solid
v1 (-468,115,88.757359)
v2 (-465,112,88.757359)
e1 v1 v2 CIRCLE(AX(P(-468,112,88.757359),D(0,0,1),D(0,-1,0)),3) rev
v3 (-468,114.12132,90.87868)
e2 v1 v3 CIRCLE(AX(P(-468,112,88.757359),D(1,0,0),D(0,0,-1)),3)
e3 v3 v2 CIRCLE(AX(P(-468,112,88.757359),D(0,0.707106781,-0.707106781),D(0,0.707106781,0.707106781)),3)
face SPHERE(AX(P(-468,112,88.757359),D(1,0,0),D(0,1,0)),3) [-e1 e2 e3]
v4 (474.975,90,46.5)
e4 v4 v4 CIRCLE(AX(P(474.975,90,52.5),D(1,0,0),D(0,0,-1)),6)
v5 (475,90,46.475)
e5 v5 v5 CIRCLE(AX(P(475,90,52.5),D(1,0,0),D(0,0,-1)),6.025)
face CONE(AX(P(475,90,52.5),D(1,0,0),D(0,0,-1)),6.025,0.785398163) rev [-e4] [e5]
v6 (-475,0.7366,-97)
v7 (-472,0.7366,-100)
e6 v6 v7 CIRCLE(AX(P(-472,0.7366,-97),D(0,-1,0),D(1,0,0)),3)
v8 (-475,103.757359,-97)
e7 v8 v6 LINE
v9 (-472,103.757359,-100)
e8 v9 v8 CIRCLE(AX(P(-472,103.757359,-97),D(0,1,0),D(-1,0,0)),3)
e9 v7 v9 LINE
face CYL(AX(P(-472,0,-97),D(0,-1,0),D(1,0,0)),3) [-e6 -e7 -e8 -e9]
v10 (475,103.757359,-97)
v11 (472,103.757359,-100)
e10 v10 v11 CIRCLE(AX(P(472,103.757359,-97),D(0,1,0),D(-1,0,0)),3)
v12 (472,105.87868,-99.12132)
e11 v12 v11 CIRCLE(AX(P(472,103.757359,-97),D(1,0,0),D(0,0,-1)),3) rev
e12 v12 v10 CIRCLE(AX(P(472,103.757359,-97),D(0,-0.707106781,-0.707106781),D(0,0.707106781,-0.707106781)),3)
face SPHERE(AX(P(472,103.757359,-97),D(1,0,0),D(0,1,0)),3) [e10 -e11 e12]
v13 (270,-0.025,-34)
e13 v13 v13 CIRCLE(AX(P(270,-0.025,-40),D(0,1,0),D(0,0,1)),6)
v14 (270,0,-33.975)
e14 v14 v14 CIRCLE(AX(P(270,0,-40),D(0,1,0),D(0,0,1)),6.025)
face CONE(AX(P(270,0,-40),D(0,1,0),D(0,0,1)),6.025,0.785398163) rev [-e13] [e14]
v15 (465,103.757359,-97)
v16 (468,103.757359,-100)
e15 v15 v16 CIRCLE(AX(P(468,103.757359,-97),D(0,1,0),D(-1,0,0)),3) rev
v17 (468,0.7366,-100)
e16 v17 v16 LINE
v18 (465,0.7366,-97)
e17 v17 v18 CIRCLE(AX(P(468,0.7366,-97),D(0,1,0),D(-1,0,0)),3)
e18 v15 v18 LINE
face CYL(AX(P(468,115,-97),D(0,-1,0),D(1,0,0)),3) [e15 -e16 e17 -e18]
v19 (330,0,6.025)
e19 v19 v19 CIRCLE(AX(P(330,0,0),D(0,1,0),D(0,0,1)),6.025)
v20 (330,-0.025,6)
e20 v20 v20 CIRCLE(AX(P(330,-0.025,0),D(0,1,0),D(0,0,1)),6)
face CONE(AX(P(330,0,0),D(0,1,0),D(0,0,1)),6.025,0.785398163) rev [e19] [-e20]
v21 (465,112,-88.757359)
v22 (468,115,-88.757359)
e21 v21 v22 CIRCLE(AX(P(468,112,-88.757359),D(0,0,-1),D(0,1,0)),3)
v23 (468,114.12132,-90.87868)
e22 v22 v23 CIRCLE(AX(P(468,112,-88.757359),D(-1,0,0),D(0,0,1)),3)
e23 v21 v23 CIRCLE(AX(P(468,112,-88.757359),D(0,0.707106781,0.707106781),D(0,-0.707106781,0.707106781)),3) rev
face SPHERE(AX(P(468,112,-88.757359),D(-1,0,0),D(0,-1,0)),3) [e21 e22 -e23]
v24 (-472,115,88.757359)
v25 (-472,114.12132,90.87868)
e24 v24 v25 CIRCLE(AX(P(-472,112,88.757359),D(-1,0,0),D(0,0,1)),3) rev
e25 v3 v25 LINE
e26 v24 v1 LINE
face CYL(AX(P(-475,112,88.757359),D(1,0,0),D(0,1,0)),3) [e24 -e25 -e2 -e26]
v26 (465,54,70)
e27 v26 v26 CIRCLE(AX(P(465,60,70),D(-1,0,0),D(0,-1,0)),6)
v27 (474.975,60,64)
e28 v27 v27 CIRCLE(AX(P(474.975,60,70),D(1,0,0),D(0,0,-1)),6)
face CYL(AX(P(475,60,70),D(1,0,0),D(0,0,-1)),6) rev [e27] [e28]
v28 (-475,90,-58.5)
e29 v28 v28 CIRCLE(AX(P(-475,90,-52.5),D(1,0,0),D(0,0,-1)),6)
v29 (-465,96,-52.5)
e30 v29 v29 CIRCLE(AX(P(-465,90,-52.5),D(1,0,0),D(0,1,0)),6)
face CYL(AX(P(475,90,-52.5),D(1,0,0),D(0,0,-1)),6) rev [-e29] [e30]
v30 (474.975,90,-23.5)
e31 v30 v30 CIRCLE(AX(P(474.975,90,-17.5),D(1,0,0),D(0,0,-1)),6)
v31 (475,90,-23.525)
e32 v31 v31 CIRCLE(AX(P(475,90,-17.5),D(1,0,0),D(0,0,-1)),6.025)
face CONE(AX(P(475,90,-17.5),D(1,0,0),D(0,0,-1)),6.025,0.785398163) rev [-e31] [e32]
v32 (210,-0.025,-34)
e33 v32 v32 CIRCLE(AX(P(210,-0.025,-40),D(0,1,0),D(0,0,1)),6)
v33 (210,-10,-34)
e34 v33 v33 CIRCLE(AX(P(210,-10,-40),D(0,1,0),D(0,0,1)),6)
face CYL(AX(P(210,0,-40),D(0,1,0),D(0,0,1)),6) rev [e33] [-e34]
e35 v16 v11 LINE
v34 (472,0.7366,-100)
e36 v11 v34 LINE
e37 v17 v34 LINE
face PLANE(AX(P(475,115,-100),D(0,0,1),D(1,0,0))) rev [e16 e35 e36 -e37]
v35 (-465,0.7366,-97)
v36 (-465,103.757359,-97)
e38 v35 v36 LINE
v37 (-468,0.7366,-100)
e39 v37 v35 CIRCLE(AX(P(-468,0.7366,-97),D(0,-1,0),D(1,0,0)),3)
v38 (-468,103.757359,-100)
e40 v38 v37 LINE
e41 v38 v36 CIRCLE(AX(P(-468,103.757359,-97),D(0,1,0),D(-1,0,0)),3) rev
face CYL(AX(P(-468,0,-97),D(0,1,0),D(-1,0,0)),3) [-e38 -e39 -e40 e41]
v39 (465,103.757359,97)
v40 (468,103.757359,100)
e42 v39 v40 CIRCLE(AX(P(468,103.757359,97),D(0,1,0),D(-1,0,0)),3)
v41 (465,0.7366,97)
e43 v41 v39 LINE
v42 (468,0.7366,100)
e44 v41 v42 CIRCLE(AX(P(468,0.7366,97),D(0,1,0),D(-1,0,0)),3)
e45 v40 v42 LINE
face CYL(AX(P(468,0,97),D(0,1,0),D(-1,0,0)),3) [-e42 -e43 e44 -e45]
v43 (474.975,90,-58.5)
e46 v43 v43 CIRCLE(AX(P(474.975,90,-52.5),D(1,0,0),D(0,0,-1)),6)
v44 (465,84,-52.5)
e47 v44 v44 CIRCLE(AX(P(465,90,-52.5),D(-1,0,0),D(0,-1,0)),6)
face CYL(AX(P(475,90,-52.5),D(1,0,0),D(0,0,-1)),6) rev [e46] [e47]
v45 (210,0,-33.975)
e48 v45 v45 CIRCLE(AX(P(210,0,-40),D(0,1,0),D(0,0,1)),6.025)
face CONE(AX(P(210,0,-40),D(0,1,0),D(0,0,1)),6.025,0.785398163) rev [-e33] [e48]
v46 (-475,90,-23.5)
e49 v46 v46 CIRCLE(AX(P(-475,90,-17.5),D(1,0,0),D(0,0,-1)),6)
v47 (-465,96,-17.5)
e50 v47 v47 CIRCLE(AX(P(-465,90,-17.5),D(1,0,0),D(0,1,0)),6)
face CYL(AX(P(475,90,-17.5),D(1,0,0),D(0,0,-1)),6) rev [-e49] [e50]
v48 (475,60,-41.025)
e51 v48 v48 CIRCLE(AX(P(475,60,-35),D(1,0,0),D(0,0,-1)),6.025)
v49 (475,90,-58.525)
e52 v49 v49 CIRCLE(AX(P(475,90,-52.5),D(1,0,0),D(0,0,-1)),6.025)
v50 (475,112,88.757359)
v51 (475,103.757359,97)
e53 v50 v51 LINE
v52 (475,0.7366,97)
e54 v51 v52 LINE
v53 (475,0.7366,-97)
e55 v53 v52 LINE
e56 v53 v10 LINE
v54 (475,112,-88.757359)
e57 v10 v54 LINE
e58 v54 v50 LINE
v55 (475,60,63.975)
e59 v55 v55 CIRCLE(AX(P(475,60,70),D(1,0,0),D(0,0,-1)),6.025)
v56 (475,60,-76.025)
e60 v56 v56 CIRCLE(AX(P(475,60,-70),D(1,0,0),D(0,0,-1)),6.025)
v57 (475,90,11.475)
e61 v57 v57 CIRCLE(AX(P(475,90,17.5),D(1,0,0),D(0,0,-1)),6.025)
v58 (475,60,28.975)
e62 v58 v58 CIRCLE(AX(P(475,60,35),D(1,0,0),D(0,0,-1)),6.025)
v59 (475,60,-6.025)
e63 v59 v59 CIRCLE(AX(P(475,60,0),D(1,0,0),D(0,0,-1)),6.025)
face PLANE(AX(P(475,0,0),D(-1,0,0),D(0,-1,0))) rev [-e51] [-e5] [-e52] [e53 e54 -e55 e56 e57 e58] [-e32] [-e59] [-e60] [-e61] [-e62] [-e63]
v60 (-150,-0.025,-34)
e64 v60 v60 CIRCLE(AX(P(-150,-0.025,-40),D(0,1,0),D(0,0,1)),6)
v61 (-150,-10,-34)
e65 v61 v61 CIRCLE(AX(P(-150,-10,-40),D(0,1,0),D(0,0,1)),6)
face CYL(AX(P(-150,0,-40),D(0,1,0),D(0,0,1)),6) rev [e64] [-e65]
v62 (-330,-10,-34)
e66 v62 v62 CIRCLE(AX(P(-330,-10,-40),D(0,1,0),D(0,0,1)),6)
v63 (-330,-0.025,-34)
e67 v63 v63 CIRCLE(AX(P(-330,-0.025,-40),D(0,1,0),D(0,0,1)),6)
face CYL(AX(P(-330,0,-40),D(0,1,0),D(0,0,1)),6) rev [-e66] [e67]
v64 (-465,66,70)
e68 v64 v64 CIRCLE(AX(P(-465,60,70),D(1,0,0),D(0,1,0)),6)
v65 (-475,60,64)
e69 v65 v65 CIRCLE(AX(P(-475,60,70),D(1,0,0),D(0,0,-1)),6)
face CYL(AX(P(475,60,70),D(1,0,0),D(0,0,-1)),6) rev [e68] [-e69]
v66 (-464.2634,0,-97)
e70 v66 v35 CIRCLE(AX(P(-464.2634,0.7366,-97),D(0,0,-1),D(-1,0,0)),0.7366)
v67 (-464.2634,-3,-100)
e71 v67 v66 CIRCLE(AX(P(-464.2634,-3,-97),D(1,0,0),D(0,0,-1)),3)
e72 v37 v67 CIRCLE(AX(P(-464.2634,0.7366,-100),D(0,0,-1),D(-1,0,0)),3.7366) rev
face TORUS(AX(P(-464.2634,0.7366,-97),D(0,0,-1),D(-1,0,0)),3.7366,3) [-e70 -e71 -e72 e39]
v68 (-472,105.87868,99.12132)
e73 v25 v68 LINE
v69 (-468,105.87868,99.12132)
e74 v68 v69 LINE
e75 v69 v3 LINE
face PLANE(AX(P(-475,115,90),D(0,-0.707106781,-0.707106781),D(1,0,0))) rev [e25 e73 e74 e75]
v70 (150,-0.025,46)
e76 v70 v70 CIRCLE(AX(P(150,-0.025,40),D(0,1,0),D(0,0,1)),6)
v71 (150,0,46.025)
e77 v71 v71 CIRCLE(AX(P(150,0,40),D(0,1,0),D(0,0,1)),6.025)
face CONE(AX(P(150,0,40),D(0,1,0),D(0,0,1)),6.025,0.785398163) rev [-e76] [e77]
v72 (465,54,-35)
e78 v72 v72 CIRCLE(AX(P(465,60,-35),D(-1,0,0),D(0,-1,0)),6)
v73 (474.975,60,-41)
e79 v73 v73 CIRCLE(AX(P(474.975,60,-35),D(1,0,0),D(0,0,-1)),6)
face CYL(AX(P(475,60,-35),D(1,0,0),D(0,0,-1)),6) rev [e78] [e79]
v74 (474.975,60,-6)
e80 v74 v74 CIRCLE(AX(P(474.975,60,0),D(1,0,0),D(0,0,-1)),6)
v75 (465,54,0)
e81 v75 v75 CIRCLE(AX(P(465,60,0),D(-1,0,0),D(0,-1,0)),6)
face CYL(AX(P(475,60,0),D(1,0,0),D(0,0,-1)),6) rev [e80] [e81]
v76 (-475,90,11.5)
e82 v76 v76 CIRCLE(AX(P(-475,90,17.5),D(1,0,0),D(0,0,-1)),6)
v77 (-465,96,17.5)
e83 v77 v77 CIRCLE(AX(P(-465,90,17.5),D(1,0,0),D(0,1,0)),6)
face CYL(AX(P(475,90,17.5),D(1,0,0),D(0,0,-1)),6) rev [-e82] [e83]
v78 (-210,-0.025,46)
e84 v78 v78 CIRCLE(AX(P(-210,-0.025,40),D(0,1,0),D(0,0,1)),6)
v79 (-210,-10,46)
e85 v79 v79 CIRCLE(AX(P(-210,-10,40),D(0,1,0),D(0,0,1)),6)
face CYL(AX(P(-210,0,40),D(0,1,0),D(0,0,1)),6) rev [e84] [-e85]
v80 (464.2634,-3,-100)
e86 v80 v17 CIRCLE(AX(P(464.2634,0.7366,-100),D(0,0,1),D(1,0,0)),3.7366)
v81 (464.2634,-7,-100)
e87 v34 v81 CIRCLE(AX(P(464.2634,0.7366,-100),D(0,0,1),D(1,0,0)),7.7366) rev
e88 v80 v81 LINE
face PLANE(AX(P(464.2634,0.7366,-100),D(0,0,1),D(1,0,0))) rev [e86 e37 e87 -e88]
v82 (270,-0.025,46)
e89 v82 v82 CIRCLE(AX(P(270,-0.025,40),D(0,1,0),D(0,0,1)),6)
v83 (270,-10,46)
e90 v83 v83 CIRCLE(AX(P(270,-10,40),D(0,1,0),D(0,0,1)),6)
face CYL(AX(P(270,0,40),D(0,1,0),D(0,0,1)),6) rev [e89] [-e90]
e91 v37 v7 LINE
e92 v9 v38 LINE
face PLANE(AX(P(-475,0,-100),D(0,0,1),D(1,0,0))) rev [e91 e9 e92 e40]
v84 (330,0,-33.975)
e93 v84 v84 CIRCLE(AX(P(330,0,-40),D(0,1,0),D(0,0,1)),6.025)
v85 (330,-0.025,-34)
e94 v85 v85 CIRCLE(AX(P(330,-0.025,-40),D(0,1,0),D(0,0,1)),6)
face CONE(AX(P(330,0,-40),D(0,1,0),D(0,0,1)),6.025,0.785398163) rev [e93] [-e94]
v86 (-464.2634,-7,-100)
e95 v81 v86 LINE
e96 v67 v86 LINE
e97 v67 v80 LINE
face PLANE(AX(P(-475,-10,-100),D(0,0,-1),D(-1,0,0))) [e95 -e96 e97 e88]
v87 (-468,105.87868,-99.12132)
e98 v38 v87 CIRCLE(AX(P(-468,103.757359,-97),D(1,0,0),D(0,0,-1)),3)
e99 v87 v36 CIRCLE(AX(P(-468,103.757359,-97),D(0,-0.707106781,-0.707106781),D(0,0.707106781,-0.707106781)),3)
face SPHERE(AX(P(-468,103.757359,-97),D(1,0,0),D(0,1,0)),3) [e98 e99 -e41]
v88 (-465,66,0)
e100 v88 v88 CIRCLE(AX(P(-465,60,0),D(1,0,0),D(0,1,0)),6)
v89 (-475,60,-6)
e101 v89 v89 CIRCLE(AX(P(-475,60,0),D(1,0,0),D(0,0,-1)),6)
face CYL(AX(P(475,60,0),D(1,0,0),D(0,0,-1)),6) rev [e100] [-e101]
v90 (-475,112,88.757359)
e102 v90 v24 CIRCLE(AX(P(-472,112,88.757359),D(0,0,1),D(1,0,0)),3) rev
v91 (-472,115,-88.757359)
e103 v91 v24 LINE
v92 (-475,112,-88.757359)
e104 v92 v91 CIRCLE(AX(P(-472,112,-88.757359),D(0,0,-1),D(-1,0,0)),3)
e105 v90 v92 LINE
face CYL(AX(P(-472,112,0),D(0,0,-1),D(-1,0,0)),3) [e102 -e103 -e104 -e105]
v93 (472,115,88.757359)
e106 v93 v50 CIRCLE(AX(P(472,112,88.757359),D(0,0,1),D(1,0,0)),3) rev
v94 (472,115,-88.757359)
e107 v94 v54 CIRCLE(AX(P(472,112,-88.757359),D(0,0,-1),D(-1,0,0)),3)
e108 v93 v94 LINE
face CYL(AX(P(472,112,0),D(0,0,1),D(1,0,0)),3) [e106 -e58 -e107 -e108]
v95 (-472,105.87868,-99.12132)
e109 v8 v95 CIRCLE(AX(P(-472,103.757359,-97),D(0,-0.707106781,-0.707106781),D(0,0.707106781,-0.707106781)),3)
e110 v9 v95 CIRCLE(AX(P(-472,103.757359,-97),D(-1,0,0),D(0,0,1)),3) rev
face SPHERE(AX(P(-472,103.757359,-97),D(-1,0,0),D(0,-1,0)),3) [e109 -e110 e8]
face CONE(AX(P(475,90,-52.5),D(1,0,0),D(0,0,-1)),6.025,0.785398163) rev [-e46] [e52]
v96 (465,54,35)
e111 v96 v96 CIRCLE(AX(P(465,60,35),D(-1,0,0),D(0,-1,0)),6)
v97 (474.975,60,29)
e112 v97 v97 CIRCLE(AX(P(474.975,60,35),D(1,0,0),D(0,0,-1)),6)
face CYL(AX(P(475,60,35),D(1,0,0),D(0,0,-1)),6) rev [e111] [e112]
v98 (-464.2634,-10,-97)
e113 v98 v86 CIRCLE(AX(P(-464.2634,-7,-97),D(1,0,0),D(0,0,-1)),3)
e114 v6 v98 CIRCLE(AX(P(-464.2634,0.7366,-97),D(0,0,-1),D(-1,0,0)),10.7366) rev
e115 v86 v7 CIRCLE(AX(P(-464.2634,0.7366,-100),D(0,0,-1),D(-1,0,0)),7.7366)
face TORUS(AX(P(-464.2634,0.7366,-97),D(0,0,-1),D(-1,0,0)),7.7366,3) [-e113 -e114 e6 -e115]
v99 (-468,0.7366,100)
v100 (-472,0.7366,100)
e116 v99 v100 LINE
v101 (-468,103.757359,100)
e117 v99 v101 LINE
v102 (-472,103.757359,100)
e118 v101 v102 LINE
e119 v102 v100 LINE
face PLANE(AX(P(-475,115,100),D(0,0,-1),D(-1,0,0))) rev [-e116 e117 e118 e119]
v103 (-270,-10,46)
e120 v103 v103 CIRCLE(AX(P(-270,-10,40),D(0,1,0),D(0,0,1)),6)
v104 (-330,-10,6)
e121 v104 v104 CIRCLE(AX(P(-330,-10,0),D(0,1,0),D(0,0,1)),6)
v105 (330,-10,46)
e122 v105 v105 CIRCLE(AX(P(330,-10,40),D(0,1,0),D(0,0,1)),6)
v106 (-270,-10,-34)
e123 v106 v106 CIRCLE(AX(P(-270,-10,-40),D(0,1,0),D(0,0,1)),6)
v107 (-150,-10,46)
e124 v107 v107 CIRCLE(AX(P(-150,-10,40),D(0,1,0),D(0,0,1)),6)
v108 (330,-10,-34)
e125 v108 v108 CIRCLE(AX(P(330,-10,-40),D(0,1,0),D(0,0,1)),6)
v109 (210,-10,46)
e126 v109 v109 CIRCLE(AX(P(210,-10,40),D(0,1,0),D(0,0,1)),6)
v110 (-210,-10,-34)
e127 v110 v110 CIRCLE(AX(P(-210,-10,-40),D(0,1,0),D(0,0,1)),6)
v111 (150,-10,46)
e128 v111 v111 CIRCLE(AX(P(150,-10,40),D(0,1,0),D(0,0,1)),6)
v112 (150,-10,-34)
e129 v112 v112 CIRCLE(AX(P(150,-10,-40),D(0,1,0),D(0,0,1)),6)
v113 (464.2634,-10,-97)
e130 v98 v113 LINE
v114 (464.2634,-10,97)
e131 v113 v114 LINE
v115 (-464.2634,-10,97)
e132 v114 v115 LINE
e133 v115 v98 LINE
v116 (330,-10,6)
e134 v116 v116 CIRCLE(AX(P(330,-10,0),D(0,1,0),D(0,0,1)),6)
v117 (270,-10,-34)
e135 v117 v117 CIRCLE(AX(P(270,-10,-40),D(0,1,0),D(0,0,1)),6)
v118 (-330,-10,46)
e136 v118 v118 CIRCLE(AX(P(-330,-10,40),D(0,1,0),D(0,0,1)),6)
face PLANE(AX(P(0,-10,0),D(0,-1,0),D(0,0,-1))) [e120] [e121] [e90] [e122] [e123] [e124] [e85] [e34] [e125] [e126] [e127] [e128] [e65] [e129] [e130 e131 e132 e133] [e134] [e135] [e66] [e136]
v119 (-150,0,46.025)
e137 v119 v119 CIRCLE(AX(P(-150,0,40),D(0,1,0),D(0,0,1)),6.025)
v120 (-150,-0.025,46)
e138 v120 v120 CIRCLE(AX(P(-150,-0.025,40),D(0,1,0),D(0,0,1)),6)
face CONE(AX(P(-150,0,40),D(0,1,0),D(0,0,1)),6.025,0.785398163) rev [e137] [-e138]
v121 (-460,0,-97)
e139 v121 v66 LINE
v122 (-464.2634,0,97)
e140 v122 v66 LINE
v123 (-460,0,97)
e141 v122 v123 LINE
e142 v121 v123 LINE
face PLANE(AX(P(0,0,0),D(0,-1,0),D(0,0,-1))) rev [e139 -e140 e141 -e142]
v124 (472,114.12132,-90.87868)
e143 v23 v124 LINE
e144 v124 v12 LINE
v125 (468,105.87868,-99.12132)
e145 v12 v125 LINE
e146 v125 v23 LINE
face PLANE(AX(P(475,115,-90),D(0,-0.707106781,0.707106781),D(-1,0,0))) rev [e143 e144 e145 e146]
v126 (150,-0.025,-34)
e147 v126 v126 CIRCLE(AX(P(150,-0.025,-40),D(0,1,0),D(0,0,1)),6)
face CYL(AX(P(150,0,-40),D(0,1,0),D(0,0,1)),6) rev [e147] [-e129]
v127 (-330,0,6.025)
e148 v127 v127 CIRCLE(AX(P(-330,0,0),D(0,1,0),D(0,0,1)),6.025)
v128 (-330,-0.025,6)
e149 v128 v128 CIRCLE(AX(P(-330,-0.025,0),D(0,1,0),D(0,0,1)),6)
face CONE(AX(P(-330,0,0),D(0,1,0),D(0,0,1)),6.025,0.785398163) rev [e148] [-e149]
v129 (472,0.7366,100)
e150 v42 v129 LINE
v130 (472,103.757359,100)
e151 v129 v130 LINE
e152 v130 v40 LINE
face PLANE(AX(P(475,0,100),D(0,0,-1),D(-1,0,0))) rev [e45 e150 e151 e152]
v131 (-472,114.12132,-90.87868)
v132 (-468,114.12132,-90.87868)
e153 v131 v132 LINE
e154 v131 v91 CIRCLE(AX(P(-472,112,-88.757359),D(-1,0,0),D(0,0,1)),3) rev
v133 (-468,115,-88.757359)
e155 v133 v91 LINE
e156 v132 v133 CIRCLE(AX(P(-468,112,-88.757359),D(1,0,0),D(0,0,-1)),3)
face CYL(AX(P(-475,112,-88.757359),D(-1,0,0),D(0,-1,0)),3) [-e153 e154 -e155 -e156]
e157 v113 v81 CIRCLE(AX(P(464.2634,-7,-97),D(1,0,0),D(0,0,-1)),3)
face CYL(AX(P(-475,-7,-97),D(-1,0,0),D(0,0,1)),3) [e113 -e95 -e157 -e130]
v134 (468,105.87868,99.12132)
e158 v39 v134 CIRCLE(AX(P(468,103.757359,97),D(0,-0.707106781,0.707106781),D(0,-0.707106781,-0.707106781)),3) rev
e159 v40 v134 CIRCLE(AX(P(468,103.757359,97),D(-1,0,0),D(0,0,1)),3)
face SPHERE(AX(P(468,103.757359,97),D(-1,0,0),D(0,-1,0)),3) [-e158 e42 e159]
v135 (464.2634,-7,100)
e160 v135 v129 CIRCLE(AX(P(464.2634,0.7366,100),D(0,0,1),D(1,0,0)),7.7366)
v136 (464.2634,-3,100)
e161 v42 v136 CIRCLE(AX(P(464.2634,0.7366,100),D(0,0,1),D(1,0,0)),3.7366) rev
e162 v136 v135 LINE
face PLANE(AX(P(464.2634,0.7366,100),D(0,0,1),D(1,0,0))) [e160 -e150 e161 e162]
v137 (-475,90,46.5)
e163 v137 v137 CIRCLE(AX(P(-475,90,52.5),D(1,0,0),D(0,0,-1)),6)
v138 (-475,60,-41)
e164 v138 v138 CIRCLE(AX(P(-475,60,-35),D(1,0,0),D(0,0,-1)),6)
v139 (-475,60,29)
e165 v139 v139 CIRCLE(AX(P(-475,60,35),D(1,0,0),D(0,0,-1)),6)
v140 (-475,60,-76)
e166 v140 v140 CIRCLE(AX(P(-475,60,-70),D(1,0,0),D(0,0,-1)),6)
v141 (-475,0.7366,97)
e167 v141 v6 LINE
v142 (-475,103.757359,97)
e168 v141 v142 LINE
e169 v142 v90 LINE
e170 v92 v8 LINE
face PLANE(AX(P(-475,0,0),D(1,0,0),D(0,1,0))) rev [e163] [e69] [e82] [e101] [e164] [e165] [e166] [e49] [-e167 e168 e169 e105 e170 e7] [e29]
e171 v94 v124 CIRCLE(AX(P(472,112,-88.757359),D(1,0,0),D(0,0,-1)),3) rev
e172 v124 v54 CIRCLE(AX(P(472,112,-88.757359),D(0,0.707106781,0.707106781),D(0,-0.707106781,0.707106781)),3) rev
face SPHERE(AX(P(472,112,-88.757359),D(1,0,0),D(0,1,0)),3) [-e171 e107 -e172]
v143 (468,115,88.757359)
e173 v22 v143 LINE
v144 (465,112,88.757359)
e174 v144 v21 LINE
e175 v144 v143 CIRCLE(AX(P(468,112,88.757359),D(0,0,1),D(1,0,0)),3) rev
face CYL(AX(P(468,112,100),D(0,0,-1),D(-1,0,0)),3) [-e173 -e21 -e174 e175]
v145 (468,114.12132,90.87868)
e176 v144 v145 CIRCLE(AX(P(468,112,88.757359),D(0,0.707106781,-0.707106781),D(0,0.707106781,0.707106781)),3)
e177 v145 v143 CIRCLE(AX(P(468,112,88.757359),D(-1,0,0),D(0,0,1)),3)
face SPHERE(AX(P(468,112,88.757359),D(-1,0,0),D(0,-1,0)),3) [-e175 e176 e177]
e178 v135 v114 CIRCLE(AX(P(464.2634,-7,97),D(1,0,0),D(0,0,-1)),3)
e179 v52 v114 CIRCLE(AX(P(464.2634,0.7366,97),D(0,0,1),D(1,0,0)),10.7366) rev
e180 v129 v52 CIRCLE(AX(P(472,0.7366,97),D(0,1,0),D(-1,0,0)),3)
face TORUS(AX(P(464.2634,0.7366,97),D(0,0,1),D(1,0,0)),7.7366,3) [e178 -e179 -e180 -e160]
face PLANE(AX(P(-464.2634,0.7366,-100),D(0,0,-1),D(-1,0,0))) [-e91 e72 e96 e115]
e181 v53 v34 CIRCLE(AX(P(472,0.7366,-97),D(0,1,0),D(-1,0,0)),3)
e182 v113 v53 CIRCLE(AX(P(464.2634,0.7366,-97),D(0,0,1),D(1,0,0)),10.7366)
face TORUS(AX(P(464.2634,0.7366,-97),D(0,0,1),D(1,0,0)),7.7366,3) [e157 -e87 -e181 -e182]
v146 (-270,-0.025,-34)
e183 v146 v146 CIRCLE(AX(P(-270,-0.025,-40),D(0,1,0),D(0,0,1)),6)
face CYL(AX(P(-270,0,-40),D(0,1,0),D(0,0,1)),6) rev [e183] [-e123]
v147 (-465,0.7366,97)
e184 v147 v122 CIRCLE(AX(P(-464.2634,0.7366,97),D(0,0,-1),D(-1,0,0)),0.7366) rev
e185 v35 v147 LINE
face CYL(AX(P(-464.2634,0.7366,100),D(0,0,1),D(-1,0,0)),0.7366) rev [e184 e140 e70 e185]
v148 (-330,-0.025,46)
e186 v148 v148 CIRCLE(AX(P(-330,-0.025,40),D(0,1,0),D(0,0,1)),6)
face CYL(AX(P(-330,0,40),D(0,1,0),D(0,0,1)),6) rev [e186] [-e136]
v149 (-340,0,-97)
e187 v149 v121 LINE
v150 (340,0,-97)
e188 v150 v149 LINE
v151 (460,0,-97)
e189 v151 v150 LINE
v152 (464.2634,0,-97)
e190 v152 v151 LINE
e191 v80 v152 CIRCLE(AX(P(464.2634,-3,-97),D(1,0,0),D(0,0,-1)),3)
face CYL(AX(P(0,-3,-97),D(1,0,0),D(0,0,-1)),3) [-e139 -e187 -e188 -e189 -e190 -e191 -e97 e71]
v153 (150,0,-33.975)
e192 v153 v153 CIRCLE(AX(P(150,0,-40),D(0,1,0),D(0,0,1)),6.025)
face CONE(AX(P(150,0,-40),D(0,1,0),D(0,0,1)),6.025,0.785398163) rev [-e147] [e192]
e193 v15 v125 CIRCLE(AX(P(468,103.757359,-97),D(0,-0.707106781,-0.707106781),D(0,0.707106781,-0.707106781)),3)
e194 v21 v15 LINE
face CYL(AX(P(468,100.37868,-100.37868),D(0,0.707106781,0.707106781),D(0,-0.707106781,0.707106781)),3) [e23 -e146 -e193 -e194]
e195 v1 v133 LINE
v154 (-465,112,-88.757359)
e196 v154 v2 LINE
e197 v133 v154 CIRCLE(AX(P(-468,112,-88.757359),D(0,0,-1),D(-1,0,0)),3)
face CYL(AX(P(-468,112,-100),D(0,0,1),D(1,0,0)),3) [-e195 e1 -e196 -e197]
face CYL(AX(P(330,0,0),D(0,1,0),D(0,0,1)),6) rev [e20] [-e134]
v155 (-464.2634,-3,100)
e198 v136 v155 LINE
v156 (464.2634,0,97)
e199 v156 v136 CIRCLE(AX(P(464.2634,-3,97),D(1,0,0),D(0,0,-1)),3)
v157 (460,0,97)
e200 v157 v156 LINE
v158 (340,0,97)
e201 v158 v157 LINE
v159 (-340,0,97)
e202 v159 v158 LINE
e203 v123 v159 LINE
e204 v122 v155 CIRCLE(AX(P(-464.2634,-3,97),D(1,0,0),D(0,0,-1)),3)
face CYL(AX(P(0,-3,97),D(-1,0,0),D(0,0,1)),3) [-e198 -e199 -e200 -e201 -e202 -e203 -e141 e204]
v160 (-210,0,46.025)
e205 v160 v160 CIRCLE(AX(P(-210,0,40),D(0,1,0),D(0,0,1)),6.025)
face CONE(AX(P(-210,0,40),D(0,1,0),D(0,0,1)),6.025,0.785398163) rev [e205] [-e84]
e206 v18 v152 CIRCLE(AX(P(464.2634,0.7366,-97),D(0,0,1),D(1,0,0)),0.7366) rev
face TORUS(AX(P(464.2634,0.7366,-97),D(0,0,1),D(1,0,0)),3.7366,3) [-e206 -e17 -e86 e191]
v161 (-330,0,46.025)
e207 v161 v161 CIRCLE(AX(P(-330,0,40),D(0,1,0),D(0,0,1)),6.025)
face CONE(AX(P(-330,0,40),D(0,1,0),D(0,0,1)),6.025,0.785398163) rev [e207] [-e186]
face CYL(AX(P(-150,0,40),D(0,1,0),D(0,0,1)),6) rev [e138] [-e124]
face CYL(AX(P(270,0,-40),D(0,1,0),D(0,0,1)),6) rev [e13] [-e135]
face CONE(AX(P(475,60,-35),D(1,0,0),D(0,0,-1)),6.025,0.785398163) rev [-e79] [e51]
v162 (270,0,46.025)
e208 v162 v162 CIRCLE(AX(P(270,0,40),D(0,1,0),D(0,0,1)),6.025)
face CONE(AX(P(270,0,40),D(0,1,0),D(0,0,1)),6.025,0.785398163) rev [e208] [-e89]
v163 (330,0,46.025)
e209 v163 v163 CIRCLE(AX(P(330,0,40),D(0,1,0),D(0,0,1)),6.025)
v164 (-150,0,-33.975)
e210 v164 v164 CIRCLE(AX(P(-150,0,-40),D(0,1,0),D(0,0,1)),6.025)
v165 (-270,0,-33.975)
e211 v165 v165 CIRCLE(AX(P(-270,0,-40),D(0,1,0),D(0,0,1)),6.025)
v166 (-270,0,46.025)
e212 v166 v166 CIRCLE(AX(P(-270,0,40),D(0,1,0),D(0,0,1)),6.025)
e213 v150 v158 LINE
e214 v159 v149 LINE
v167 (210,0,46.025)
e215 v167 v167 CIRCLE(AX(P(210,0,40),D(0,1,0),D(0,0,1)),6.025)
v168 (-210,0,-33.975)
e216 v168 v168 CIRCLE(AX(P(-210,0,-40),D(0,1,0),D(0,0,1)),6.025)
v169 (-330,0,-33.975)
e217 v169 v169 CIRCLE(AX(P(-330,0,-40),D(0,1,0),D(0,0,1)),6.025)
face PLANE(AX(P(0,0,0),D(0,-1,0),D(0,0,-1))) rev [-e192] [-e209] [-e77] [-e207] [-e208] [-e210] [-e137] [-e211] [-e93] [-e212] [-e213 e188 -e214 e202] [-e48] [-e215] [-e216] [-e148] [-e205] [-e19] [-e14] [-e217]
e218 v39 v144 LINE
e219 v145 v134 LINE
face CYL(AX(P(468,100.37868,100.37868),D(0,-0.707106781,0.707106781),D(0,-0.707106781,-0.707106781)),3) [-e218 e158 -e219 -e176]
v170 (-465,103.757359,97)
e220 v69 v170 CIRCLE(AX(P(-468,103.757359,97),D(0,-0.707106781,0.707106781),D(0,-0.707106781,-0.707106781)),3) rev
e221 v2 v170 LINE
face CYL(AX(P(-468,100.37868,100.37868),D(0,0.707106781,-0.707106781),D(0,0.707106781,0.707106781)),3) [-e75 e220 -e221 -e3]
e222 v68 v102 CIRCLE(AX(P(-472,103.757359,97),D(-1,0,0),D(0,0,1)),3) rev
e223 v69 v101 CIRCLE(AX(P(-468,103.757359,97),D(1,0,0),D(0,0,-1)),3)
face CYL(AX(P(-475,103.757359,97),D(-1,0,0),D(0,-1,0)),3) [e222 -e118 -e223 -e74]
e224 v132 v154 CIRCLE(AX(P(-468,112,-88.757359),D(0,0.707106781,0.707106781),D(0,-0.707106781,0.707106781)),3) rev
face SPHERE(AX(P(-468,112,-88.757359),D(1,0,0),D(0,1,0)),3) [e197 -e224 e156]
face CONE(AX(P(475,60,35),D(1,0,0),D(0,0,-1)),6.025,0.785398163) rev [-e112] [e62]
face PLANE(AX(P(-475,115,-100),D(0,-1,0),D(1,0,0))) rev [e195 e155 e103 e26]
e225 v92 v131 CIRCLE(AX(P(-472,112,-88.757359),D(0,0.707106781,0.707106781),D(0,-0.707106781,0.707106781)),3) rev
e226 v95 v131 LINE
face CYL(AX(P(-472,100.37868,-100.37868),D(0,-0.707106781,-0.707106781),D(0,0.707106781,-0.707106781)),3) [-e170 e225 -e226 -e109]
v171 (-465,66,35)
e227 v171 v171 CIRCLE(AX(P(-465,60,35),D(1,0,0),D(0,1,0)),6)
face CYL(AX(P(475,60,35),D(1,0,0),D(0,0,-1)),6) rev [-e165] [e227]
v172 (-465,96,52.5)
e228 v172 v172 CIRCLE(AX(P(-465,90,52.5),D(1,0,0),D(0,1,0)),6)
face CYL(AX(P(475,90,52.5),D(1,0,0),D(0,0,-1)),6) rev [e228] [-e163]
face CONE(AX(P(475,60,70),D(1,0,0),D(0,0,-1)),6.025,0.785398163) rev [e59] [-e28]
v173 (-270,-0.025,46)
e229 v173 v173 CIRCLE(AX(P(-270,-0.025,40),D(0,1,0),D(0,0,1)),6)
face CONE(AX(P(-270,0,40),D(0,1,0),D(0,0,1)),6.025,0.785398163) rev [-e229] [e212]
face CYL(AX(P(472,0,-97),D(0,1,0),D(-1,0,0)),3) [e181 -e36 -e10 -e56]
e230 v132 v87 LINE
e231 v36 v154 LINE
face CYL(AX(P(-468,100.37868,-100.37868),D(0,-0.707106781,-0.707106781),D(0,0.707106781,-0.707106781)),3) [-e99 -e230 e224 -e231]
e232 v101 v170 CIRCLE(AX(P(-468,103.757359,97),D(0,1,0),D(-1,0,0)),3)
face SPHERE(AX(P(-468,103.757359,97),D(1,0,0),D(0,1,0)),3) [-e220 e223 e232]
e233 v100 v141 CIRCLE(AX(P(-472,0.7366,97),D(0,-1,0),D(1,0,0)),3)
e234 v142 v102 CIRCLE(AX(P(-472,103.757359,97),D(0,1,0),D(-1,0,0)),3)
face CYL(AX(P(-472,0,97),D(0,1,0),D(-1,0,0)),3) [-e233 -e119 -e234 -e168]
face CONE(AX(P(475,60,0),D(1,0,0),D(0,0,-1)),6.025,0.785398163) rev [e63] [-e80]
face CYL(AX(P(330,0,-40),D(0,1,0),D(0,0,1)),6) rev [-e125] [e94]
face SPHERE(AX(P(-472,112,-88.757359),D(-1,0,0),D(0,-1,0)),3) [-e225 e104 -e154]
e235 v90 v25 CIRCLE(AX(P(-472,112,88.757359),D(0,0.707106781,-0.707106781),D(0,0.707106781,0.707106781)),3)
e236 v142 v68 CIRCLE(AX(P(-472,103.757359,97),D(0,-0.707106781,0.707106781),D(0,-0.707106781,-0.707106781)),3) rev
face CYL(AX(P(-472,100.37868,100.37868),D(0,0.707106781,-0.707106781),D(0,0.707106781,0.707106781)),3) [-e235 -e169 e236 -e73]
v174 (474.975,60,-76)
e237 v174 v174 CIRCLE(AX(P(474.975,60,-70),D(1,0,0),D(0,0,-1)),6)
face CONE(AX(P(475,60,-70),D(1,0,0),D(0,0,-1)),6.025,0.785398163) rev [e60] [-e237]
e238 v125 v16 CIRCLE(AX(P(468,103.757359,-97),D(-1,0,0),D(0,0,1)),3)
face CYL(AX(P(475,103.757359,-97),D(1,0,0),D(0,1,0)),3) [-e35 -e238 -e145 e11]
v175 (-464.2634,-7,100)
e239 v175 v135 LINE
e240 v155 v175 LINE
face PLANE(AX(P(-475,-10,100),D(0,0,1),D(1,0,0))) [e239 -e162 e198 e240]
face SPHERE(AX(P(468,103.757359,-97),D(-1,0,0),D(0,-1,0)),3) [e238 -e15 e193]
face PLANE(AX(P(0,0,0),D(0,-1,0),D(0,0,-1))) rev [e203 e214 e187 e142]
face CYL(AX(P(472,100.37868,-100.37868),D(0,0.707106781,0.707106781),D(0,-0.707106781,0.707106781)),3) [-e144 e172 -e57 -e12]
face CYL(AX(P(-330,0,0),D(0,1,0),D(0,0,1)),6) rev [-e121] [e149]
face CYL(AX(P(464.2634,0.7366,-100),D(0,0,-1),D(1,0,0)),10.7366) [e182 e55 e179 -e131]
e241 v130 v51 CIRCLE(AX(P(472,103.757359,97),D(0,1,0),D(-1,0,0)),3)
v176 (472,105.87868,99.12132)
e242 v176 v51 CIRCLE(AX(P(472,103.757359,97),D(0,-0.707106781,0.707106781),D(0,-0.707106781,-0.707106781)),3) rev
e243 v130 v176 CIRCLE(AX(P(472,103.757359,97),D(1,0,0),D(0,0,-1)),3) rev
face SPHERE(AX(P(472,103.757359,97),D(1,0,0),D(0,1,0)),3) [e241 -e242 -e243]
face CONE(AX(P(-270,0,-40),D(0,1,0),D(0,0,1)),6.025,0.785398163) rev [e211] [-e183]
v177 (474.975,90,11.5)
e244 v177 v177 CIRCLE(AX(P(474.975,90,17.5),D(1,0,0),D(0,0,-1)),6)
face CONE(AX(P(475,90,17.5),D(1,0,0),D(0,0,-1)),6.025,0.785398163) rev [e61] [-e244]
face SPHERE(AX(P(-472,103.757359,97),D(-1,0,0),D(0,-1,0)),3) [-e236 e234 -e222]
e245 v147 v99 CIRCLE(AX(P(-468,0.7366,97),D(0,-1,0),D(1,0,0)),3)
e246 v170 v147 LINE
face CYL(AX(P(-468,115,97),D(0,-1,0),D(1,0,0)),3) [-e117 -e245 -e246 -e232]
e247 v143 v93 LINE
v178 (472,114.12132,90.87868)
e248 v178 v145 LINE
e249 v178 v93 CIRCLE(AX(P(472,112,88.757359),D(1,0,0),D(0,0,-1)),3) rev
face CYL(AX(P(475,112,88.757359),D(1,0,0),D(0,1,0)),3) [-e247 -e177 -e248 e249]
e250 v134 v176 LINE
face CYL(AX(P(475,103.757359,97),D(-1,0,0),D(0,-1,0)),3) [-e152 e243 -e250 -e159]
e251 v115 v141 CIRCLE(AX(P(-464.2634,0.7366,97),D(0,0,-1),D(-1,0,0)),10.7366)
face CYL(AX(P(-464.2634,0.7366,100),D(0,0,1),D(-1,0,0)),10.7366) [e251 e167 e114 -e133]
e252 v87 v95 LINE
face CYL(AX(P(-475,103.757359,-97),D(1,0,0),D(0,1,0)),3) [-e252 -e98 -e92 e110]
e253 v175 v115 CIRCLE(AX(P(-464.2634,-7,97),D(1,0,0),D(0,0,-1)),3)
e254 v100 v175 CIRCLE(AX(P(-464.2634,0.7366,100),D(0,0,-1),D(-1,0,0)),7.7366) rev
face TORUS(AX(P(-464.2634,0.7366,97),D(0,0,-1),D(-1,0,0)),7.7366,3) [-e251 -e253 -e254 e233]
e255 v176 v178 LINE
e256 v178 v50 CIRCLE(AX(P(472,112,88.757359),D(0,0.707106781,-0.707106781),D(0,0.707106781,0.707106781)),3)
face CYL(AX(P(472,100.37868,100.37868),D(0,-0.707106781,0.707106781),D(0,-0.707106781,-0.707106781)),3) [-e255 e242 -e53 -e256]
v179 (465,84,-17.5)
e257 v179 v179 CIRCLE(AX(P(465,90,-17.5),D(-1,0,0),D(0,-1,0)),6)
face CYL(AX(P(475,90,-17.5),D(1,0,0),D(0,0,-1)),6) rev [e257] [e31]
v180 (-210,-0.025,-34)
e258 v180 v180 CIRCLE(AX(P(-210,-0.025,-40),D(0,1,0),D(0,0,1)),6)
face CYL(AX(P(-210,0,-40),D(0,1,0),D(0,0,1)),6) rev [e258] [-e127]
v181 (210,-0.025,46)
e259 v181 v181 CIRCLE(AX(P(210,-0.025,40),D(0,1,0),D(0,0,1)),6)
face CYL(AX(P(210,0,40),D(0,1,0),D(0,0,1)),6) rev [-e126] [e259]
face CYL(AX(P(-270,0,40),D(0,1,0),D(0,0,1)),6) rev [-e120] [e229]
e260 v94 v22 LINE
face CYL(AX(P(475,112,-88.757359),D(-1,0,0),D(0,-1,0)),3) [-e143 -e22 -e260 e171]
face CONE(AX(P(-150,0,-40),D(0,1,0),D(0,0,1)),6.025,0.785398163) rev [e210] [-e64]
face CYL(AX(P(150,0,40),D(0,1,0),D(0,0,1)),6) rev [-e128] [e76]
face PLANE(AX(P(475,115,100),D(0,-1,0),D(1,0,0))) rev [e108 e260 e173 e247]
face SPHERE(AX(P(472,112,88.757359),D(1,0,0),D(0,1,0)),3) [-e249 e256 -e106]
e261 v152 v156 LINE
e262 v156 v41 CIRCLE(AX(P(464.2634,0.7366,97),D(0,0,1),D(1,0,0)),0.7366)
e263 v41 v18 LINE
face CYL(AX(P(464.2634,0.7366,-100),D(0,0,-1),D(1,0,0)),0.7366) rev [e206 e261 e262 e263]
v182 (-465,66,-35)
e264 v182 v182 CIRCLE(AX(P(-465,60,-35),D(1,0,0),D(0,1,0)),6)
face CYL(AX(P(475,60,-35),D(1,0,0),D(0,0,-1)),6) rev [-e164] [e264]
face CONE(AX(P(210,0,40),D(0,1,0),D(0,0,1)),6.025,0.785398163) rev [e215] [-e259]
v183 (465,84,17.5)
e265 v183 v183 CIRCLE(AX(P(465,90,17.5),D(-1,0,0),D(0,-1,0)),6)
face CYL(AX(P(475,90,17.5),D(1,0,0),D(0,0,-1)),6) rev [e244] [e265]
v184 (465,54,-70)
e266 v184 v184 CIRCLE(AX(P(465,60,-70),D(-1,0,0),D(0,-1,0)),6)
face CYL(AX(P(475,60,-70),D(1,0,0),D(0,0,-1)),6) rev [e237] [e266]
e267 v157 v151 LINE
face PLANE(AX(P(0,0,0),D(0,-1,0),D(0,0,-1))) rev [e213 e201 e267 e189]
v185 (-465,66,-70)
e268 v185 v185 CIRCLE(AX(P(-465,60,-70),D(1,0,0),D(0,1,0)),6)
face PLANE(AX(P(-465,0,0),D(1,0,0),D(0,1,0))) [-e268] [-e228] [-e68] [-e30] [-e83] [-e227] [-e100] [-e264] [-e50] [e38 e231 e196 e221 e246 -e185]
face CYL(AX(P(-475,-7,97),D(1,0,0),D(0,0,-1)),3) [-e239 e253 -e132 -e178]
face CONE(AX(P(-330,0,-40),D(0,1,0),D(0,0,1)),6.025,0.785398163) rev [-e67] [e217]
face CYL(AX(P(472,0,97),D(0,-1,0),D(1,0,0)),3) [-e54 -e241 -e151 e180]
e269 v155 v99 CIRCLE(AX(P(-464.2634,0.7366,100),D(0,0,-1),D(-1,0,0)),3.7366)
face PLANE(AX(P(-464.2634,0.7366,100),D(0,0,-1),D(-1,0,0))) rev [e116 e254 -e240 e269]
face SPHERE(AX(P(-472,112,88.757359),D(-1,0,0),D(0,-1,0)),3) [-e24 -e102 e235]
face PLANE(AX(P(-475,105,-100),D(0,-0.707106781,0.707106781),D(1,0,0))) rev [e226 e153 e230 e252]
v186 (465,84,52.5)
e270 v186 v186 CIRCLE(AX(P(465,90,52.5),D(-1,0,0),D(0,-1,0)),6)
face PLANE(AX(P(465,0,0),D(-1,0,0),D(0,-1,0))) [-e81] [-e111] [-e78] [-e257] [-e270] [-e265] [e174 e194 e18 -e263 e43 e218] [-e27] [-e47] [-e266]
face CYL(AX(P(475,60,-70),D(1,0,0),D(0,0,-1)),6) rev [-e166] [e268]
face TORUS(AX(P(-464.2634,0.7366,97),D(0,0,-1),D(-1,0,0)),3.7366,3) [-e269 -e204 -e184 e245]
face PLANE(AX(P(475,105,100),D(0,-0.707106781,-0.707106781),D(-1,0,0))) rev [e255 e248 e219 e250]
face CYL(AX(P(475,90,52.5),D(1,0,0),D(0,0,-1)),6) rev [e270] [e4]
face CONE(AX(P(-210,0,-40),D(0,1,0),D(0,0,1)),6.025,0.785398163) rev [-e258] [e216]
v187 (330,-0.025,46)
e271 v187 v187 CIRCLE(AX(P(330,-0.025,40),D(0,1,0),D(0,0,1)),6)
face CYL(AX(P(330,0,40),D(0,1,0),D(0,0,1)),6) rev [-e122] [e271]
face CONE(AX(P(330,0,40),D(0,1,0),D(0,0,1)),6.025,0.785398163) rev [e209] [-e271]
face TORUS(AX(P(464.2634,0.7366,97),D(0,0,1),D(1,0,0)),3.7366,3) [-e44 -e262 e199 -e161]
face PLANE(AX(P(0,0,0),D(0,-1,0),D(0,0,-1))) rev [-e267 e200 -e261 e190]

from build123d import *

# Parameters (mm, degrees)
SKETCH1_W                       = 950
SKETCH1_H                       = 200
BASE_FLANGE1_DEPTH              = 10
EDGE_FLANGE1_STRIP_W            = 41.4732
EDGE_FLANGE1_STRIP_H            = 10
EDGE_FLANGE1_STRIP_CUT_DEPTH    = 200
EDGE_FLANGE1_STRIP_2_W          = 41.4732
EDGE_FLANGE1_STRIP_2_H          = 10
EDGE_FLANGE1_STRIP_CUT_2_DEPTH  = 200
EDGE_FLANGE1_DEPTH              = 200
EDGE_FLANGE1_BEND_DEPTH         = 200
BREAK_CORNER1_START             = -475
BREAK_CORNER1_DEPTH             = 950
M10_CLEARANCE_HOLE1_D           = 12
M10_CLEARANCE_HOLE1_CSINK_D     = 12.05
M10_CLEARANCE_HOLE1_CSINK_ANGLE = 90
M10_CLEARANCE_HOLE2_D           = 12
M10_CLEARANCE_HOLE2_CSINK_D     = 12.05
M10_CLEARANCE_HOLE2_CSINK_ANGLE = 90
FILLET1_R                       = 3


# Read off the part's stored shape, not the designer's step: Break-Corner1
# Sheet-metal steps are written as plain solids
with BuildPart() as part:
    # Sketch1 → Base-Flange1 (new body)
    with BuildSketch(Plane(origin=(0, 0, 0), x_dir=(1, 0, 0), z_dir=(0, 1, 0))):
        Rectangle(SKETCH1_W, SKETCH1_H)
    extrude(amount=-BASE_FLANGE1_DEPTH)

    # Edge-Flange1 strip (across the edge) → Edge-Flange1 strip cut (cut)
    with BuildSketch(Plane(origin=(-475, 0, -100), x_dir=(1, 0, 0), z_dir=(0, 0, 1))):
        with Locations((-10, -5)):
            Rectangle(EDGE_FLANGE1_STRIP_W, EDGE_FLANGE1_STRIP_H)
    extrude(amount=EDGE_FLANGE1_STRIP_CUT_DEPTH, mode=Mode.SUBTRACT)

    # Edge-Flange1 strip 2 (across the edge) → Edge-Flange1 strip cut 2 (cut)
    with BuildSketch(Plane(origin=(475, 0, 100), x_dir=(-1, 0, 0), z_dir=(0, 0, -1))):
        with Locations((-10, -5)):
            Rectangle(EDGE_FLANGE1_STRIP_2_W, EDGE_FLANGE1_STRIP_2_H)
    extrude(amount=EDGE_FLANGE1_STRIP_CUT_2_DEPTH, mode=Mode.SUBTRACT)

    # Edge-Flange1 section (across the edge) → Edge-Flange1 (add)
    with BuildSketch(Plane(origin=(-475, 0, -100), x_dir=(1, 0, 0), z_dir=(0, 0, 1))):
        with BuildLine():
            Line((0, 0.7366), (0, 115))
            Line((0, 115), (10, 115))
            Line((10, 115), (10, 0.7366))
            ThreePointArc((10, 0.7366), (10.215745145, 0.215745145), (10.7366, 0))
            Line((10.7366, 0), (10.7366, -10))
            ThreePointArc((10.7366, -10), (3.144677333, -6.855322667), (0, 0.7366))
        make_face()
    extrude(amount=EDGE_FLANGE1_DEPTH)

    # Edge-Flange1 section 2 (across the edge) → Edge-Flange1 bend (add)
    with BuildSketch(Plane(origin=(475, 0, 100), x_dir=(-1, 0, 0), z_dir=(0, 0, -1))):
        with BuildLine():
            Line((0, 0.7366), (0, 115))
            Line((0, 115), (10, 115))
            Line((10, 115), (10, 0.7366))
            ThreePointArc((10, 0.7366), (10.215745145, 0.215745145), (10.7366, 0))
            Line((10.7366, 0), (10.7366, -10))
            ThreePointArc((10.7366, -10), (3.144677333, -6.855322667), (0, 0.7366))
        make_face()
    extrude(amount=EDGE_FLANGE1_BEND_DEPTH)

    # Break-Corner1 outline → Break-Corner1 (cut)
    with BuildSketch(Plane.YZ.offset(BREAK_CORNER1_START)):
        Polygon((115, 100), (105, 100), (115, 90), align=None)
        Polygon((115, -100), (115, -90), (105, -100), align=None)
    extrude(amount=BREAK_CORNER1_DEPTH, mode=Mode.SUBTRACT)

    # M10 Clearance Hole1 (through all)
    with Locations(Plane(origin=(475, 60, -70), x_dir=(0, 1, 0), z_dir=(1, 0, 0))):
        with Locations((0, 0), (0, 35), (0, 70), (0, 105), (0, 140), (30, 17.5), (30, 52.5), (30, 87.5), (30, 122.5)):
            CounterSinkHole(M10_CLEARANCE_HOLE1_D / 2, M10_CLEARANCE_HOLE1_CSINK_D / 2, counter_sink_angle=M10_CLEARANCE_HOLE1_CSINK_ANGLE)

    # M10 Clearance Hole2 (through all)
    with Locations(Plane(origin=(0, 0, 0), x_dir=(1, 0, 0), z_dir=(0, 1, 0))):
        with Locations((330, 40), (270, 40), (210, 40), (150, 40), (330, 0), (330, -40), (270, -40), (210, -40), (150, -40)):
            m10_clearance_hole2 = CounterSinkHole(M10_CLEARANCE_HOLE2_D / 2, M10_CLEARANCE_HOLE2_CSINK_D / 2, counter_sink_angle=M10_CLEARANCE_HOLE2_CSINK_ANGLE)

    # Mirror1: M10 Clearance Hole2 across plane
    add(m10_clearance_hole2.mirror(Plane(origin=(0, 0, 0), x_dir=(0, 0, 1), z_dir=(1, 0, 0))), mode=Mode.SUBTRACT)

    # Fillet1
    fillet1_edges = [part.edges().sort_by_distance(p)[0] for p in [
        (465, 110, 95),
        (470, 115, 90),
        (475, 110, 95),
        (0, 0, 100),
        (0, -10, 100),
        (0, 0, -100),
        (0, -10, -100),
        (-471.855322667, -6.855322667, -100),
        (-471.855322667, -6.855322667, 100),
        (-464.784254855, 0.215745145, -100),
        (-464.784254855, 0.215745145, 100),
        (-465, 52.8683, 100),
        (-475, 52.8683, 100),
        (471.855322667, -6.855322667, 100),
        (471.855322667, -6.855322667, -100),
        (464.784254855, 0.215745145, 100),
        (464.784254855, 0.215745145, -100),
        (465, 52.8683, -100),
        (475, 52.8683, -100),
        (-465, 115, 0),
        (-475, 115, 0),
        (-470, 115, 90),
        (-465, 110, 95),
        (-470, 105, 100),
        (-475, 110, 95),
        (-475, 52.8683, -100),
        (-465, 52.8683, -100),
        (-470, 105, -100),
        (-465, 110, -95),
        (-470, 115, -90),
        (-475, 110, -95),
        (465, 115, 0),
        (475, 115, 0),
        (470, 115, -90),
        (465, 110, -95),
        (470, 105, -100),
        (475, 110, -95),
        (475, 52.8683, 100),
        (465, 52.8683, 100),
        (470, 105, 100),
    ]]
    fillet(fillet1_edges, radius=FILLET1_R)


solid = part.part
